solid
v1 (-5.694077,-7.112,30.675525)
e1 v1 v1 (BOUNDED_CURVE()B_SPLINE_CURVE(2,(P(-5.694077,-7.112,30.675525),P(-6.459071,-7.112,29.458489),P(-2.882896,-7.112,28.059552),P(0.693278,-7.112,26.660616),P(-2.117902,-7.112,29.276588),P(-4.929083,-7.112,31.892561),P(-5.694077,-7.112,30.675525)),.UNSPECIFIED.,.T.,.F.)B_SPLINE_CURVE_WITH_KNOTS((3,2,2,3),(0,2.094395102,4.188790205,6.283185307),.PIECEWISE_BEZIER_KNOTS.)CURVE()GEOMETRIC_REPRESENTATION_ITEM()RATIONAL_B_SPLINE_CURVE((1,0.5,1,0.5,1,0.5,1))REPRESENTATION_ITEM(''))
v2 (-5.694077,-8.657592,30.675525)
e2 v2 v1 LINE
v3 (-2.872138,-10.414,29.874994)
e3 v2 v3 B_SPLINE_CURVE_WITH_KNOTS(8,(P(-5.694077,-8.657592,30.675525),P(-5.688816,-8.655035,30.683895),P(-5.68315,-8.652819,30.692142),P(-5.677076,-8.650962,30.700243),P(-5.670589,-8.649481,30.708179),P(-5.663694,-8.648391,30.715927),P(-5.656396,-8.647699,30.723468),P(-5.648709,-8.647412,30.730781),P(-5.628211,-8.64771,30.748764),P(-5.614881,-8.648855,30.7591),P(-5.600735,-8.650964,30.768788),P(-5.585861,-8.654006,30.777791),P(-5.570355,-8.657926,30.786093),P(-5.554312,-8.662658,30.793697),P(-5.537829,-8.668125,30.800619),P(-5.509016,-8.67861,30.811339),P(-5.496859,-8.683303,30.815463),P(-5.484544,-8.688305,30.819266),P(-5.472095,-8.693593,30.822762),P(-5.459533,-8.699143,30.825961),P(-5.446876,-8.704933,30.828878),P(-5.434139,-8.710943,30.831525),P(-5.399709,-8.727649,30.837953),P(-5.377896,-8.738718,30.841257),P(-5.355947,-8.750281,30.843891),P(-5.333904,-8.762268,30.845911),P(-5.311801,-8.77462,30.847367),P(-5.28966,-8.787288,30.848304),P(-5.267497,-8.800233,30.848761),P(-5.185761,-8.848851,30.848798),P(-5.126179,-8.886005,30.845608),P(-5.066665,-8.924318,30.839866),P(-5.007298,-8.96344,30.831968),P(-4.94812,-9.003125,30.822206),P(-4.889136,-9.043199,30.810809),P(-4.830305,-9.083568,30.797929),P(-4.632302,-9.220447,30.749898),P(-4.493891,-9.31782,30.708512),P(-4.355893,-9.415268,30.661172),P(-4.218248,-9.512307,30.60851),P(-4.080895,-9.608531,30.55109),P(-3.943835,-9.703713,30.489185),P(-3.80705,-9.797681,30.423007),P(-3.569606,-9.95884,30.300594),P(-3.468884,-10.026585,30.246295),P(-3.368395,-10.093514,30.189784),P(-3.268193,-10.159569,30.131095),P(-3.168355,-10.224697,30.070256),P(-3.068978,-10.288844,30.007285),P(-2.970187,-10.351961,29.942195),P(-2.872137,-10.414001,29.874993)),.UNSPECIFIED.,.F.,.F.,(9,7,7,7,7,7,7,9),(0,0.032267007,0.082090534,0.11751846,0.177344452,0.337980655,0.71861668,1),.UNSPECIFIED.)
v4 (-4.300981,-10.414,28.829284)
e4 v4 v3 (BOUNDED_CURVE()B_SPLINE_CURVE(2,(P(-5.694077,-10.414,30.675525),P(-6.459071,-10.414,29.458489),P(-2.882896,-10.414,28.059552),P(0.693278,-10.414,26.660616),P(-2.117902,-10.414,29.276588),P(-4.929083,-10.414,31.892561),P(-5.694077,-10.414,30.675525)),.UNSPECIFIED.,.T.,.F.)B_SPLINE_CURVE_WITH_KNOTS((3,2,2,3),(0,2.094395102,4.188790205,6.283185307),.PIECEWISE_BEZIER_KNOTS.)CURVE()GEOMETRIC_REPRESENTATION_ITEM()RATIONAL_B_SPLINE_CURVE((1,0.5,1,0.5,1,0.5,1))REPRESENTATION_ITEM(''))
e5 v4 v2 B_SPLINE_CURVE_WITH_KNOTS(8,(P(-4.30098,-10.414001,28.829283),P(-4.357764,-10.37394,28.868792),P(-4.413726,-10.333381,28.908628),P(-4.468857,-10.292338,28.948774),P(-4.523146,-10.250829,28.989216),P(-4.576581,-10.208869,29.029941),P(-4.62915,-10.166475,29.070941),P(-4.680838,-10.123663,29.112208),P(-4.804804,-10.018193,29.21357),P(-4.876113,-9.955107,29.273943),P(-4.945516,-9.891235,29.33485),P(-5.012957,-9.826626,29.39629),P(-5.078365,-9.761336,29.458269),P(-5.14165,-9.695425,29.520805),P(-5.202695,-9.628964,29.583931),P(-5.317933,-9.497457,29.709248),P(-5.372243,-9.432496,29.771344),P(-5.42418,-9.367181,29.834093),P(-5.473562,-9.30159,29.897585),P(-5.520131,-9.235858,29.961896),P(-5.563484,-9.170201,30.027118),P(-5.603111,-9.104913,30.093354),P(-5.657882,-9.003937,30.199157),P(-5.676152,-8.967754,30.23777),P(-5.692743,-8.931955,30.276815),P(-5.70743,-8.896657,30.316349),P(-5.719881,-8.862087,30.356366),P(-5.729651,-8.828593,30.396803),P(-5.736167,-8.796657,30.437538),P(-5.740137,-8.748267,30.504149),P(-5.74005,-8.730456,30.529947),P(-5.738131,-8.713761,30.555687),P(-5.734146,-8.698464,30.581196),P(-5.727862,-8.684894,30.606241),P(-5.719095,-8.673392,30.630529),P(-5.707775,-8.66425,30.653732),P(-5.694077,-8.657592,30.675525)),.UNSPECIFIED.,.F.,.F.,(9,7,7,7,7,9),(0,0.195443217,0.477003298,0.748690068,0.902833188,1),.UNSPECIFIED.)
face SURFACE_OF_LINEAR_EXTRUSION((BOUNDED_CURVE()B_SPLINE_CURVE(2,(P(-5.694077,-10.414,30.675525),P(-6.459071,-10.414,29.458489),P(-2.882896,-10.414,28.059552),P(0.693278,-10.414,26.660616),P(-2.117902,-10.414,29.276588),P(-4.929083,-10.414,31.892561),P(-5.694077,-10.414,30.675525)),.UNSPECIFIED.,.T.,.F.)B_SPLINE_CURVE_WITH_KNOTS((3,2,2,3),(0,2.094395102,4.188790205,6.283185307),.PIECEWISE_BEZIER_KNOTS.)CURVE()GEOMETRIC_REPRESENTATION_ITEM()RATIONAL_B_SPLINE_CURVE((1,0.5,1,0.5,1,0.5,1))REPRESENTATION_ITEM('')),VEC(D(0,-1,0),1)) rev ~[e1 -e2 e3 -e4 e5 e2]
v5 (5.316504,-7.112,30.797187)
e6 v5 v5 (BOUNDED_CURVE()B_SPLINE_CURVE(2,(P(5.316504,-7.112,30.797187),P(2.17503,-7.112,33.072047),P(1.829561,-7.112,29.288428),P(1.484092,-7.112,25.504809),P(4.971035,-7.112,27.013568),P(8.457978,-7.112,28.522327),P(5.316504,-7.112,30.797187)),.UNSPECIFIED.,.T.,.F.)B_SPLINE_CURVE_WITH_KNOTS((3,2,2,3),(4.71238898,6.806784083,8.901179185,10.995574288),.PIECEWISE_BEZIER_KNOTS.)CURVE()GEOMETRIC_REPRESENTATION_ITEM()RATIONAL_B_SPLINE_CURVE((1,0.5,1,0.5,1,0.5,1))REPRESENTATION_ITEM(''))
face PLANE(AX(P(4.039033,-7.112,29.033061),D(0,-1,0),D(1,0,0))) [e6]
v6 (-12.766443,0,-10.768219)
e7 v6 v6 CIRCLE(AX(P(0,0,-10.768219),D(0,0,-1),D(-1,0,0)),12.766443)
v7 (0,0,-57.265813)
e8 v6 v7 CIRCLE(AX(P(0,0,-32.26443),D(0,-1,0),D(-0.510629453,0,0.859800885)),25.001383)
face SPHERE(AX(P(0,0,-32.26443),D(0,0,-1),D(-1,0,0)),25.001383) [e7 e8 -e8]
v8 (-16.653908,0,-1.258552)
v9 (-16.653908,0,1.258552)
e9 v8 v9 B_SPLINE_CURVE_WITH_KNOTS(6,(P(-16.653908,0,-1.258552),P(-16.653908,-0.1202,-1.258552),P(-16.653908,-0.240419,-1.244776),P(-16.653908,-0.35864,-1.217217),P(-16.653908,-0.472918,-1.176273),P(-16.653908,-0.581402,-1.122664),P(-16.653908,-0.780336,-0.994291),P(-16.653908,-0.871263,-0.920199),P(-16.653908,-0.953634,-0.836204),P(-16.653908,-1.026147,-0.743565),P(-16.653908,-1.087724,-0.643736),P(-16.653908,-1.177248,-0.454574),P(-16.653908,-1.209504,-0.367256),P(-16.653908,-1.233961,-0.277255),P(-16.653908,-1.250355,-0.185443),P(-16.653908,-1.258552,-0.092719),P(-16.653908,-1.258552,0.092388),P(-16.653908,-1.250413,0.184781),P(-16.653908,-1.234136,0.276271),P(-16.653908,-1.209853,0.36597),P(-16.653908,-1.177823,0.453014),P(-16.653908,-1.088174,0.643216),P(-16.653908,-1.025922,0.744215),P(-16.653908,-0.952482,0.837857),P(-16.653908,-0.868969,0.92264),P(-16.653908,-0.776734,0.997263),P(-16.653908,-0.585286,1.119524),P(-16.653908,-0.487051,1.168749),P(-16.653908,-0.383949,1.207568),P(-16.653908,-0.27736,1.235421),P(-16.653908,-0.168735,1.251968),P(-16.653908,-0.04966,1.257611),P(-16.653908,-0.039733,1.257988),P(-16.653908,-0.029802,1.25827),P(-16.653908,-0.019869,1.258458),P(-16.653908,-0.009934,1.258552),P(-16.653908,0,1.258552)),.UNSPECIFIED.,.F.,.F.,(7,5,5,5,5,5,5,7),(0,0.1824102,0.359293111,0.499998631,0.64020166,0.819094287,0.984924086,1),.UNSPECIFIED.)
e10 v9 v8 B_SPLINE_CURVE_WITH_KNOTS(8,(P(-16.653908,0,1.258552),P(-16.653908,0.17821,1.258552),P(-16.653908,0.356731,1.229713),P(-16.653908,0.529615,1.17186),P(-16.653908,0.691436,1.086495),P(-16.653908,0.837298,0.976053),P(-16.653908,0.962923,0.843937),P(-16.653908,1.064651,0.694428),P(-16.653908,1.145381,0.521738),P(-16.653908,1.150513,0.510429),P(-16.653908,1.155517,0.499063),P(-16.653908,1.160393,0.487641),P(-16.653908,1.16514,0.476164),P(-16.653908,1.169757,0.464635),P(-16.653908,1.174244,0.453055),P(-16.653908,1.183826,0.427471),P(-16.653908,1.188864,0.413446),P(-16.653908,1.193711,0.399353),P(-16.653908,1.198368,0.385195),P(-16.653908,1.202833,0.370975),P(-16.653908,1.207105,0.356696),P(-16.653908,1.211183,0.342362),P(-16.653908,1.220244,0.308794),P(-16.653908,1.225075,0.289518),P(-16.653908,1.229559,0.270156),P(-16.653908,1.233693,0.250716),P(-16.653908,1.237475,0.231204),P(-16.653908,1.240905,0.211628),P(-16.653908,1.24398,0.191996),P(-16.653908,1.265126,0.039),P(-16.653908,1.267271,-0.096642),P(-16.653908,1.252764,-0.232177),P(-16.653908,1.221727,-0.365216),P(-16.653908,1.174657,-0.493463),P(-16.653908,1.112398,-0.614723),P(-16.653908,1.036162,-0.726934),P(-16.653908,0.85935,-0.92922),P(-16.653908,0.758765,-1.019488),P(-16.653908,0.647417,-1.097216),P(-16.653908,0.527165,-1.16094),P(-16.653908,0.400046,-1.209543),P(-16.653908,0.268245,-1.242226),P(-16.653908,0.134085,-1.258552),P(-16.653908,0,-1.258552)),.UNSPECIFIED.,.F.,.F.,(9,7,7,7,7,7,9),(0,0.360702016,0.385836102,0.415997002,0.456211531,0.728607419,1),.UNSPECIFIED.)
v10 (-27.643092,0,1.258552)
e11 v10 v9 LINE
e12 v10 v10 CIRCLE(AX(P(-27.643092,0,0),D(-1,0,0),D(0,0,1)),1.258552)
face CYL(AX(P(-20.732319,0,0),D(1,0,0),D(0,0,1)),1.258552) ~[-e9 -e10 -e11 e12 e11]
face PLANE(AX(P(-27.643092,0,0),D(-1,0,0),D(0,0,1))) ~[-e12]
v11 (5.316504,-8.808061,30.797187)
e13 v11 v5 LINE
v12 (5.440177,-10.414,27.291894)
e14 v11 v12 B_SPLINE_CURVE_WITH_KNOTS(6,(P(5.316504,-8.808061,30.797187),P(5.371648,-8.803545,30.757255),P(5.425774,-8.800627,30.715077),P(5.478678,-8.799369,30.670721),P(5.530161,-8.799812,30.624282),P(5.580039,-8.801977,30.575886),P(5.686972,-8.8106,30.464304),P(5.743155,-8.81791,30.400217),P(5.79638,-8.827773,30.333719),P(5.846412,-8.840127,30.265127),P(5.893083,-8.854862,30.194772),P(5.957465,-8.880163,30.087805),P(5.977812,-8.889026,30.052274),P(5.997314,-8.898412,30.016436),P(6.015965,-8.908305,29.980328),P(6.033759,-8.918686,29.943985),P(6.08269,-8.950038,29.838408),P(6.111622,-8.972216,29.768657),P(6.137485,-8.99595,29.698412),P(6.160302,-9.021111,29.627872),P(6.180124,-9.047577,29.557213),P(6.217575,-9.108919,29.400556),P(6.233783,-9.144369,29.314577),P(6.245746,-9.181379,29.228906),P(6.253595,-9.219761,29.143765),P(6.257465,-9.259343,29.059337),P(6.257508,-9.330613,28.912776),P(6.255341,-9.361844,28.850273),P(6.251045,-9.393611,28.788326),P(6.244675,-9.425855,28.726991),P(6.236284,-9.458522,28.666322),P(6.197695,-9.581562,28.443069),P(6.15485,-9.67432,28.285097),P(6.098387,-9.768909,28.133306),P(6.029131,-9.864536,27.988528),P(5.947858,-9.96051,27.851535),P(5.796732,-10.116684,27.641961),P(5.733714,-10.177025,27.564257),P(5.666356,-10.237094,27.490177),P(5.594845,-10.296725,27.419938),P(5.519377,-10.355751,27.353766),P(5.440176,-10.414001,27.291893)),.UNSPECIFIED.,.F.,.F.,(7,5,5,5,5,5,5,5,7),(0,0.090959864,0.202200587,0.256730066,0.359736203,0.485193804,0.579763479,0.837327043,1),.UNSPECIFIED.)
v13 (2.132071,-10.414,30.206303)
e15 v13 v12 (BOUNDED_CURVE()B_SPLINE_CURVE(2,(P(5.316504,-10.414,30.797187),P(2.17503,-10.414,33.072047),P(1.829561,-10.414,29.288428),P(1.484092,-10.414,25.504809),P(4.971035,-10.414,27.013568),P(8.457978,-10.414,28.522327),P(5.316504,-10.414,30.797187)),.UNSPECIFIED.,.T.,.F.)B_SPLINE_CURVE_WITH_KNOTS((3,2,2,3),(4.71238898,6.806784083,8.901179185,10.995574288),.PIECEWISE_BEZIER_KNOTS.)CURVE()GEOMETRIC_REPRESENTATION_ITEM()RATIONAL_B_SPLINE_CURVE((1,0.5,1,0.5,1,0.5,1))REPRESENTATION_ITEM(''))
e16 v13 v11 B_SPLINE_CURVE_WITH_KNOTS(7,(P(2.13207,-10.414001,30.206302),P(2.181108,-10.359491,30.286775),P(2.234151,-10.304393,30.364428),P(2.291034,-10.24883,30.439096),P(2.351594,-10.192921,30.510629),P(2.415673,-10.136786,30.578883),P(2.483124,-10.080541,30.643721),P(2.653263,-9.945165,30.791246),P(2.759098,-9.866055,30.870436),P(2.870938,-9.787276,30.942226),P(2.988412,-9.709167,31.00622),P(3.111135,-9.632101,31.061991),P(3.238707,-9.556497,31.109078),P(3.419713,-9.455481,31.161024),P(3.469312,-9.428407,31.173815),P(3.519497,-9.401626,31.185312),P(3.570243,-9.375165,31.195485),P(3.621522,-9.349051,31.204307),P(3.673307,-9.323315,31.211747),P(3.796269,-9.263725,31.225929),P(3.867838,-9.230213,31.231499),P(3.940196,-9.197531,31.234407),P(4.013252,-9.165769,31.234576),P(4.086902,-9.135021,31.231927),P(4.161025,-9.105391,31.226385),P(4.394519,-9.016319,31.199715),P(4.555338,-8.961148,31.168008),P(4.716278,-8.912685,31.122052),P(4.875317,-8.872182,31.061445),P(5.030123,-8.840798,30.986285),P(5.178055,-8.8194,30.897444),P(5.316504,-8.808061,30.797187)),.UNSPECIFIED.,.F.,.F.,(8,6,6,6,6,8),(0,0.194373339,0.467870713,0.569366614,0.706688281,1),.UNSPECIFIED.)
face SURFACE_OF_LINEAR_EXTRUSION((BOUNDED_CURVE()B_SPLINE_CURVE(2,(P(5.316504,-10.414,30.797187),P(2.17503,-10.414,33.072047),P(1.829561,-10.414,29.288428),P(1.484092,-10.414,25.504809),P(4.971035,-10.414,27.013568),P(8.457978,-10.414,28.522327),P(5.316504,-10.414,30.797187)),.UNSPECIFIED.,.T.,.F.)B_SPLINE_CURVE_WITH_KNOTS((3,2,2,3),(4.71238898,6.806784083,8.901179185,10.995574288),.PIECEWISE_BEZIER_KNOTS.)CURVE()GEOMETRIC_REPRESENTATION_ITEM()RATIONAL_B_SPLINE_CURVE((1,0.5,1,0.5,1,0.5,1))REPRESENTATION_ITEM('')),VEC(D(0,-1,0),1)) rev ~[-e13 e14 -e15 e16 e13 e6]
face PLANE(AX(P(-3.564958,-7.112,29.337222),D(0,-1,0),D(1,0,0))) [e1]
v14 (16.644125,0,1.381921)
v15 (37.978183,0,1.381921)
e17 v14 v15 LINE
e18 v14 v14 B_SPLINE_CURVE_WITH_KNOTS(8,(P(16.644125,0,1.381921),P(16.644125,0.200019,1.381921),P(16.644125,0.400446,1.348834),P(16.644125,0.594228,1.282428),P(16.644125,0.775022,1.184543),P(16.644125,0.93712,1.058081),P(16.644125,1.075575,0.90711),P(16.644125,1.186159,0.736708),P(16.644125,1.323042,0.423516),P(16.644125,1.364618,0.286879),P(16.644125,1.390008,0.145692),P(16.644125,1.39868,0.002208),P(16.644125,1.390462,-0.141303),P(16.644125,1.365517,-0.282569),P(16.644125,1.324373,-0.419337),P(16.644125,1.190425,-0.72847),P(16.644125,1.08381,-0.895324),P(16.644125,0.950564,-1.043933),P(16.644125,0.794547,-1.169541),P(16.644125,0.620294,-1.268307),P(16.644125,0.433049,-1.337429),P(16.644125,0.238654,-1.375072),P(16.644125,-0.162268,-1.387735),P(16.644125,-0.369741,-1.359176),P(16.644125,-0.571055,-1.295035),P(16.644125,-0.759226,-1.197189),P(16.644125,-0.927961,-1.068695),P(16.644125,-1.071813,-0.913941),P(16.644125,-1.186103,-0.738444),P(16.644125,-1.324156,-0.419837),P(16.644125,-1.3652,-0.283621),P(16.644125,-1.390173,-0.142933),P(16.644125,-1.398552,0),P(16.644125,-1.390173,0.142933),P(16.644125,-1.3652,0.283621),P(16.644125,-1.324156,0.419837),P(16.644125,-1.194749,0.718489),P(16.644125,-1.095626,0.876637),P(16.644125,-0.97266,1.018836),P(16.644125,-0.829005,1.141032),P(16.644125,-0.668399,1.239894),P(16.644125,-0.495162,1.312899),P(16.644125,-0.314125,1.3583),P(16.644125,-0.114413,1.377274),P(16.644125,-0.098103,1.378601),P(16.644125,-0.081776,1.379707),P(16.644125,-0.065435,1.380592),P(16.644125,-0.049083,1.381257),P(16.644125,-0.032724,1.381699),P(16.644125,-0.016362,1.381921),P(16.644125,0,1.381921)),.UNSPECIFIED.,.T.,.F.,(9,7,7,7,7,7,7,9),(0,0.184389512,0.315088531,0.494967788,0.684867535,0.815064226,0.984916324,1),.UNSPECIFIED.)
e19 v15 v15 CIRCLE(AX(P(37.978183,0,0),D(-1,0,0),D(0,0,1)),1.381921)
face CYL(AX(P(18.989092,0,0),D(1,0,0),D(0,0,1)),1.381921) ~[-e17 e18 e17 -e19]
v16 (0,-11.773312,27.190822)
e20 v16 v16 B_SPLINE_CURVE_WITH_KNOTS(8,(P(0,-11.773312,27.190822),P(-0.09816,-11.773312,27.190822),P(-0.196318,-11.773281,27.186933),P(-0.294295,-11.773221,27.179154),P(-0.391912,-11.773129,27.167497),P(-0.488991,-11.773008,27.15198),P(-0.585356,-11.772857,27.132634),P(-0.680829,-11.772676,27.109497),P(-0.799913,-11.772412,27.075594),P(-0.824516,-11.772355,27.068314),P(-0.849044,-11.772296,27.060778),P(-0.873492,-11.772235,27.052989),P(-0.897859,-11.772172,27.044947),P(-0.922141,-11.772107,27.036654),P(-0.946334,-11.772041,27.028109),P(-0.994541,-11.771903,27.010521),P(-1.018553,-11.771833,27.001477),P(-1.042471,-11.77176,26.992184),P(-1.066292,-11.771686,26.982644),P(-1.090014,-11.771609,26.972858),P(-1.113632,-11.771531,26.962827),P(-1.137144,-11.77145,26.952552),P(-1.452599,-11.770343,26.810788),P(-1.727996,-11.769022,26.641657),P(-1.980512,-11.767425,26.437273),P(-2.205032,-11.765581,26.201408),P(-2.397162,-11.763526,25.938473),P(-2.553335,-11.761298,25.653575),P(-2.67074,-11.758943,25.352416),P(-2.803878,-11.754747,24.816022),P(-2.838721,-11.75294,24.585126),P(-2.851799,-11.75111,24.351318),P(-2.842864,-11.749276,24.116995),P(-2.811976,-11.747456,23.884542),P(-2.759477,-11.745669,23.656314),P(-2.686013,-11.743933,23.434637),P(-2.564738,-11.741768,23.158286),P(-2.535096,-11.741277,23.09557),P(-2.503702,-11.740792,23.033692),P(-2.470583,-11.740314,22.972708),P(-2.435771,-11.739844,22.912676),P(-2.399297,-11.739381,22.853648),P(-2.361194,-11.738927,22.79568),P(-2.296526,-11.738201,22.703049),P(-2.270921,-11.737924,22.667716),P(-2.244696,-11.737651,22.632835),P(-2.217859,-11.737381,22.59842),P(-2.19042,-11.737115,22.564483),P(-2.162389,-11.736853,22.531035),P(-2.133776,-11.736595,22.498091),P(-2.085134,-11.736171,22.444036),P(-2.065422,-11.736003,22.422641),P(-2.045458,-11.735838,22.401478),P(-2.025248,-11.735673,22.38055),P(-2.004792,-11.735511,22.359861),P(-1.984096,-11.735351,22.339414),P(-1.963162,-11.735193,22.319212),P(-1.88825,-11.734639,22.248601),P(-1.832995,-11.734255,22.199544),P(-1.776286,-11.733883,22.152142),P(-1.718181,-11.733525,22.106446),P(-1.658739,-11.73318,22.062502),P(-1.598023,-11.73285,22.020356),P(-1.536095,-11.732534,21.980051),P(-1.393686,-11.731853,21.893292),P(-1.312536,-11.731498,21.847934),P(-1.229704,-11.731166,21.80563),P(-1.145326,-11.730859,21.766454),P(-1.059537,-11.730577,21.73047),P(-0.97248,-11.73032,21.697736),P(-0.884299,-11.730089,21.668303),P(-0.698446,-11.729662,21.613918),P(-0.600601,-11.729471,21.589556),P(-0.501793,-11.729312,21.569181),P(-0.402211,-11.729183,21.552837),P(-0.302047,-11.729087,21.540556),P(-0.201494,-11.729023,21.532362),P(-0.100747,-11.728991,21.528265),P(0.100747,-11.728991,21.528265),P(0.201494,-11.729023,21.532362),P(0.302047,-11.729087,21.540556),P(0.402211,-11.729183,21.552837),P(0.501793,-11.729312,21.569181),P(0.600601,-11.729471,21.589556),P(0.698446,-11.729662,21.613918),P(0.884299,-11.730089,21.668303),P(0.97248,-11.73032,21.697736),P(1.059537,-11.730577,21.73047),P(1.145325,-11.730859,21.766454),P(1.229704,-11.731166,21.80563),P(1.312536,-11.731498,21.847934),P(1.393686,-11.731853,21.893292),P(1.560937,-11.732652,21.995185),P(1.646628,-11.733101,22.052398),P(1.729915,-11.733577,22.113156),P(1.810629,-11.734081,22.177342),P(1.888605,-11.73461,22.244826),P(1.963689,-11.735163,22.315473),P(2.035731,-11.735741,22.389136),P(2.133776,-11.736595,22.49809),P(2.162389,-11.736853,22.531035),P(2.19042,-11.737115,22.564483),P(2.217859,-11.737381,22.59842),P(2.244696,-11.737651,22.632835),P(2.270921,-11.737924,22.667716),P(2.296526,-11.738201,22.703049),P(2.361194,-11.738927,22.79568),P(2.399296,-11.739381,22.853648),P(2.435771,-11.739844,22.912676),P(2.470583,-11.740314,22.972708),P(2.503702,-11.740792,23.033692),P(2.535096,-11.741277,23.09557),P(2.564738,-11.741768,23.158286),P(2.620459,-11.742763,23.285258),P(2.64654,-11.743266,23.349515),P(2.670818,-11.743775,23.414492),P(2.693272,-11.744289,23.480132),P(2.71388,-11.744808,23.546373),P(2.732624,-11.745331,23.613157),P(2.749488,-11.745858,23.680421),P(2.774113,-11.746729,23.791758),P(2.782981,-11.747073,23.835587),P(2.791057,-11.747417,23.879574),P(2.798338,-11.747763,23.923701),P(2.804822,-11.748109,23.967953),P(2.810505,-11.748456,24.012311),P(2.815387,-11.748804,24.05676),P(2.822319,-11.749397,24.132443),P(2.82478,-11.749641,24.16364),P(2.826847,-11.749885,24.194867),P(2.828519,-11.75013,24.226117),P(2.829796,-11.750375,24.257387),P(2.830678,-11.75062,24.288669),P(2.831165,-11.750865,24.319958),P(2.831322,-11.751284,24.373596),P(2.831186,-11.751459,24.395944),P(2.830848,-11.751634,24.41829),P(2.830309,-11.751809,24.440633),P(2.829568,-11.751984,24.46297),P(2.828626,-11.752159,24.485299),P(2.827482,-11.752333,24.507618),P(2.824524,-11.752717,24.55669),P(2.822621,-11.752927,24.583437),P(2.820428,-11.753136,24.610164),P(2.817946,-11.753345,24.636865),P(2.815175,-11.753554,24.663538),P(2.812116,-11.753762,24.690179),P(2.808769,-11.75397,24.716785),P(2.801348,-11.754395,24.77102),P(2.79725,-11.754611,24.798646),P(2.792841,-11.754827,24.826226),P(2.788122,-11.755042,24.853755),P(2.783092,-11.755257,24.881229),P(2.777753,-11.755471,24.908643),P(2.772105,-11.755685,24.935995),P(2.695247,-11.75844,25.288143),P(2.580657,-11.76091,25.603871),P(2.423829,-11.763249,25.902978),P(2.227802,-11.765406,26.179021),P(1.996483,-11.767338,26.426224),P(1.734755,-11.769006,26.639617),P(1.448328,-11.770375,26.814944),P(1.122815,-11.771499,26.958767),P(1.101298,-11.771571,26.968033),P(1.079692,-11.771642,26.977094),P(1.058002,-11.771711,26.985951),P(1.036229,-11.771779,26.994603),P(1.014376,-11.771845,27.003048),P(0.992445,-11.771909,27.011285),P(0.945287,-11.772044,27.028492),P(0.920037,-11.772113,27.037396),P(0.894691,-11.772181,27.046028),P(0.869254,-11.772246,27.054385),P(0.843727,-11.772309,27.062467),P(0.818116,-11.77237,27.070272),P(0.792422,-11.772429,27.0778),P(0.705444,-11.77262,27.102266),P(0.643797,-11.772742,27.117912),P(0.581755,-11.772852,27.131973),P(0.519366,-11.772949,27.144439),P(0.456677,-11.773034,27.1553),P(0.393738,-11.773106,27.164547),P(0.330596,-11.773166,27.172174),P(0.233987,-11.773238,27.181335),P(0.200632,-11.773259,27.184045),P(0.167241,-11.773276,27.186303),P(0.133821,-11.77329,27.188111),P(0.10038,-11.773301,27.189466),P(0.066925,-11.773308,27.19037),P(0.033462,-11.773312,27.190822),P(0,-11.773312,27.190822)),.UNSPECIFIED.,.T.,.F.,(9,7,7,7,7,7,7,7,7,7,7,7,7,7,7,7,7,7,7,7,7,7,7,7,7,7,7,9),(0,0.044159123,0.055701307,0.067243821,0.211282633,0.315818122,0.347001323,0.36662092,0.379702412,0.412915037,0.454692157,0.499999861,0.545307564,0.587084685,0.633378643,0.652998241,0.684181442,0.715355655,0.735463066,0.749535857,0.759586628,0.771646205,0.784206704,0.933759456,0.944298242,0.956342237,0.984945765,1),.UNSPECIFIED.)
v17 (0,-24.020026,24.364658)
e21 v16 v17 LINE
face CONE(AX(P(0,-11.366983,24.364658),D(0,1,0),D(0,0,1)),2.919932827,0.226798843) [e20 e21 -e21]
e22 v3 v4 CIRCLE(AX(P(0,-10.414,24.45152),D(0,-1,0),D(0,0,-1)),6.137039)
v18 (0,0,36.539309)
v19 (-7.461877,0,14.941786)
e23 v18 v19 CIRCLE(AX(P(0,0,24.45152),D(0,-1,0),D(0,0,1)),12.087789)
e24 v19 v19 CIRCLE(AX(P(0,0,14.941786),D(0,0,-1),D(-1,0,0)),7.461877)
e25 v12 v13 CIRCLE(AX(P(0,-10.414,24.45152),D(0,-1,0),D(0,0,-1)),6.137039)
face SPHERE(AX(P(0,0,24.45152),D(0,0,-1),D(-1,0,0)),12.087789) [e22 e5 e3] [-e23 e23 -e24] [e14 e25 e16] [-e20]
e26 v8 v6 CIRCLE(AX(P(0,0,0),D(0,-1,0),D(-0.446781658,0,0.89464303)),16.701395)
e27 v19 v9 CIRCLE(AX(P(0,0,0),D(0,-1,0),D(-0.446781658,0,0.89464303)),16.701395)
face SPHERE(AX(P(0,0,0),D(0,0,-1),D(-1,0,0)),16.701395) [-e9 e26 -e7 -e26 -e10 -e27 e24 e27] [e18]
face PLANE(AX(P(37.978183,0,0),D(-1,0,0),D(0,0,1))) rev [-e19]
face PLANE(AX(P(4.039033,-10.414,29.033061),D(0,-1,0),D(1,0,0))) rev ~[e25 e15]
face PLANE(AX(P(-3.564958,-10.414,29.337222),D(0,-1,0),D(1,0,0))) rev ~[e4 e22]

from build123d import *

# Parameters (mm, degrees)
F6_DEPTH = 3.302
F7_W     = 13.8215459883
F7_H     = 1.2585521908
F7_W_2   = 37.9781834781
F7_H_2   = 1.381920767


with BuildPart() as f1:
    # F0 (on Front) → F1 (revolve)
    with BuildSketch(Plane.XZ):
        with BuildLine():
            ThreePointArc((0, 36.5393093155), (-11.4251104851, 28.3988603898), (-7.4618768804, 14.9417864989))
            ThreePointArc((-7.4618768804, 14.9417864989), (-16.356873737, 3.3747995359), (-12.7664426916, -10.7682185787))
            ThreePointArc((-12.7664426916, -10.7682185787), (-24.1091703633, -38.8838765875), (0, -57.2658133922))
            Line((0, -57.2658133922), (0, 36.5393093155))
        make_face()
    revolve(axis=Axis((0, 0, -10.3632520383), (0, 0, -1)))

    # F2 (on Right) → F3 (revolve)
    with BuildSketch(Plane.YZ):
        Polygon((-24.0200255066, 24.3646577001), (-11.4886462688, 24.3646577001), (-11.3669829443, 27.2845905274), align=None)
    revolve(axis=Axis((0, -17.7543358877, 24.3646577001), (0, -1, 0)))

    # F5 (on offset) → F6 (cut)
    with BuildSketch(Plane.XZ.offset(10.414)):
        with BuildLine():
            add(Edge.make_bspline(
                [(-5.6940768845, 30.6755248457), (-6.4590711966, 29.4584885127), (-2.8828964047, 28.0595520455), (0.6932783872, 26.6606155783), (-2.1179020926, 29.2765883785), (-4.9290825725, 31.8925611787), (-5.6940768845, 30.6755248457)],
                knots=[0, 0, 0, 2.0943951024, 2.0943951024, 4.1887902048, 4.1887902048, 6.2831853072, 6.2831853072, 6.2831853072], degree=2, weights=[1, 0.5, 1, 0.5, 1, 0.5, 1]))
        make_face()
        with BuildLine():
            add(Edge.make_bspline(
                [(5.3165038116, 30.7971872389), (2.1750298927, 33.0720474057), (1.8295611088, 29.2884281393), (1.484092325, 25.5048088729), (4.9710350278, 27.0135679726), (8.4579777306, 28.5223270722), (5.3165038116, 30.7971872389)],
                knots=[4.7123889804, 4.7123889804, 4.7123889804, 6.8067840828, 6.8067840828, 8.9011791852, 8.9011791852, 10.9955742876, 10.9955742876, 10.9955742876], degree=2, weights=[1, 0.5, 1, 0.5, 1, 0.5, 1]))
        make_face()
    extrude(amount=-F6_DEPTH, mode=Mode.SUBTRACT)

    # F7 (on Front) → F8 (revolve)
    with BuildSketch(Plane.XZ):
        with Locations((-20.7323189825, 0.6292760954)):
            Rectangle(F7_W, F7_H)
        with Locations((18.9890917391, 0.6909603835)):
            Rectangle(F7_W_2, F7_H_2)
    revolve(axis=Axis((-13.8215459883, 0, 0), (-1, 0, 0)))


solid = f1.part
